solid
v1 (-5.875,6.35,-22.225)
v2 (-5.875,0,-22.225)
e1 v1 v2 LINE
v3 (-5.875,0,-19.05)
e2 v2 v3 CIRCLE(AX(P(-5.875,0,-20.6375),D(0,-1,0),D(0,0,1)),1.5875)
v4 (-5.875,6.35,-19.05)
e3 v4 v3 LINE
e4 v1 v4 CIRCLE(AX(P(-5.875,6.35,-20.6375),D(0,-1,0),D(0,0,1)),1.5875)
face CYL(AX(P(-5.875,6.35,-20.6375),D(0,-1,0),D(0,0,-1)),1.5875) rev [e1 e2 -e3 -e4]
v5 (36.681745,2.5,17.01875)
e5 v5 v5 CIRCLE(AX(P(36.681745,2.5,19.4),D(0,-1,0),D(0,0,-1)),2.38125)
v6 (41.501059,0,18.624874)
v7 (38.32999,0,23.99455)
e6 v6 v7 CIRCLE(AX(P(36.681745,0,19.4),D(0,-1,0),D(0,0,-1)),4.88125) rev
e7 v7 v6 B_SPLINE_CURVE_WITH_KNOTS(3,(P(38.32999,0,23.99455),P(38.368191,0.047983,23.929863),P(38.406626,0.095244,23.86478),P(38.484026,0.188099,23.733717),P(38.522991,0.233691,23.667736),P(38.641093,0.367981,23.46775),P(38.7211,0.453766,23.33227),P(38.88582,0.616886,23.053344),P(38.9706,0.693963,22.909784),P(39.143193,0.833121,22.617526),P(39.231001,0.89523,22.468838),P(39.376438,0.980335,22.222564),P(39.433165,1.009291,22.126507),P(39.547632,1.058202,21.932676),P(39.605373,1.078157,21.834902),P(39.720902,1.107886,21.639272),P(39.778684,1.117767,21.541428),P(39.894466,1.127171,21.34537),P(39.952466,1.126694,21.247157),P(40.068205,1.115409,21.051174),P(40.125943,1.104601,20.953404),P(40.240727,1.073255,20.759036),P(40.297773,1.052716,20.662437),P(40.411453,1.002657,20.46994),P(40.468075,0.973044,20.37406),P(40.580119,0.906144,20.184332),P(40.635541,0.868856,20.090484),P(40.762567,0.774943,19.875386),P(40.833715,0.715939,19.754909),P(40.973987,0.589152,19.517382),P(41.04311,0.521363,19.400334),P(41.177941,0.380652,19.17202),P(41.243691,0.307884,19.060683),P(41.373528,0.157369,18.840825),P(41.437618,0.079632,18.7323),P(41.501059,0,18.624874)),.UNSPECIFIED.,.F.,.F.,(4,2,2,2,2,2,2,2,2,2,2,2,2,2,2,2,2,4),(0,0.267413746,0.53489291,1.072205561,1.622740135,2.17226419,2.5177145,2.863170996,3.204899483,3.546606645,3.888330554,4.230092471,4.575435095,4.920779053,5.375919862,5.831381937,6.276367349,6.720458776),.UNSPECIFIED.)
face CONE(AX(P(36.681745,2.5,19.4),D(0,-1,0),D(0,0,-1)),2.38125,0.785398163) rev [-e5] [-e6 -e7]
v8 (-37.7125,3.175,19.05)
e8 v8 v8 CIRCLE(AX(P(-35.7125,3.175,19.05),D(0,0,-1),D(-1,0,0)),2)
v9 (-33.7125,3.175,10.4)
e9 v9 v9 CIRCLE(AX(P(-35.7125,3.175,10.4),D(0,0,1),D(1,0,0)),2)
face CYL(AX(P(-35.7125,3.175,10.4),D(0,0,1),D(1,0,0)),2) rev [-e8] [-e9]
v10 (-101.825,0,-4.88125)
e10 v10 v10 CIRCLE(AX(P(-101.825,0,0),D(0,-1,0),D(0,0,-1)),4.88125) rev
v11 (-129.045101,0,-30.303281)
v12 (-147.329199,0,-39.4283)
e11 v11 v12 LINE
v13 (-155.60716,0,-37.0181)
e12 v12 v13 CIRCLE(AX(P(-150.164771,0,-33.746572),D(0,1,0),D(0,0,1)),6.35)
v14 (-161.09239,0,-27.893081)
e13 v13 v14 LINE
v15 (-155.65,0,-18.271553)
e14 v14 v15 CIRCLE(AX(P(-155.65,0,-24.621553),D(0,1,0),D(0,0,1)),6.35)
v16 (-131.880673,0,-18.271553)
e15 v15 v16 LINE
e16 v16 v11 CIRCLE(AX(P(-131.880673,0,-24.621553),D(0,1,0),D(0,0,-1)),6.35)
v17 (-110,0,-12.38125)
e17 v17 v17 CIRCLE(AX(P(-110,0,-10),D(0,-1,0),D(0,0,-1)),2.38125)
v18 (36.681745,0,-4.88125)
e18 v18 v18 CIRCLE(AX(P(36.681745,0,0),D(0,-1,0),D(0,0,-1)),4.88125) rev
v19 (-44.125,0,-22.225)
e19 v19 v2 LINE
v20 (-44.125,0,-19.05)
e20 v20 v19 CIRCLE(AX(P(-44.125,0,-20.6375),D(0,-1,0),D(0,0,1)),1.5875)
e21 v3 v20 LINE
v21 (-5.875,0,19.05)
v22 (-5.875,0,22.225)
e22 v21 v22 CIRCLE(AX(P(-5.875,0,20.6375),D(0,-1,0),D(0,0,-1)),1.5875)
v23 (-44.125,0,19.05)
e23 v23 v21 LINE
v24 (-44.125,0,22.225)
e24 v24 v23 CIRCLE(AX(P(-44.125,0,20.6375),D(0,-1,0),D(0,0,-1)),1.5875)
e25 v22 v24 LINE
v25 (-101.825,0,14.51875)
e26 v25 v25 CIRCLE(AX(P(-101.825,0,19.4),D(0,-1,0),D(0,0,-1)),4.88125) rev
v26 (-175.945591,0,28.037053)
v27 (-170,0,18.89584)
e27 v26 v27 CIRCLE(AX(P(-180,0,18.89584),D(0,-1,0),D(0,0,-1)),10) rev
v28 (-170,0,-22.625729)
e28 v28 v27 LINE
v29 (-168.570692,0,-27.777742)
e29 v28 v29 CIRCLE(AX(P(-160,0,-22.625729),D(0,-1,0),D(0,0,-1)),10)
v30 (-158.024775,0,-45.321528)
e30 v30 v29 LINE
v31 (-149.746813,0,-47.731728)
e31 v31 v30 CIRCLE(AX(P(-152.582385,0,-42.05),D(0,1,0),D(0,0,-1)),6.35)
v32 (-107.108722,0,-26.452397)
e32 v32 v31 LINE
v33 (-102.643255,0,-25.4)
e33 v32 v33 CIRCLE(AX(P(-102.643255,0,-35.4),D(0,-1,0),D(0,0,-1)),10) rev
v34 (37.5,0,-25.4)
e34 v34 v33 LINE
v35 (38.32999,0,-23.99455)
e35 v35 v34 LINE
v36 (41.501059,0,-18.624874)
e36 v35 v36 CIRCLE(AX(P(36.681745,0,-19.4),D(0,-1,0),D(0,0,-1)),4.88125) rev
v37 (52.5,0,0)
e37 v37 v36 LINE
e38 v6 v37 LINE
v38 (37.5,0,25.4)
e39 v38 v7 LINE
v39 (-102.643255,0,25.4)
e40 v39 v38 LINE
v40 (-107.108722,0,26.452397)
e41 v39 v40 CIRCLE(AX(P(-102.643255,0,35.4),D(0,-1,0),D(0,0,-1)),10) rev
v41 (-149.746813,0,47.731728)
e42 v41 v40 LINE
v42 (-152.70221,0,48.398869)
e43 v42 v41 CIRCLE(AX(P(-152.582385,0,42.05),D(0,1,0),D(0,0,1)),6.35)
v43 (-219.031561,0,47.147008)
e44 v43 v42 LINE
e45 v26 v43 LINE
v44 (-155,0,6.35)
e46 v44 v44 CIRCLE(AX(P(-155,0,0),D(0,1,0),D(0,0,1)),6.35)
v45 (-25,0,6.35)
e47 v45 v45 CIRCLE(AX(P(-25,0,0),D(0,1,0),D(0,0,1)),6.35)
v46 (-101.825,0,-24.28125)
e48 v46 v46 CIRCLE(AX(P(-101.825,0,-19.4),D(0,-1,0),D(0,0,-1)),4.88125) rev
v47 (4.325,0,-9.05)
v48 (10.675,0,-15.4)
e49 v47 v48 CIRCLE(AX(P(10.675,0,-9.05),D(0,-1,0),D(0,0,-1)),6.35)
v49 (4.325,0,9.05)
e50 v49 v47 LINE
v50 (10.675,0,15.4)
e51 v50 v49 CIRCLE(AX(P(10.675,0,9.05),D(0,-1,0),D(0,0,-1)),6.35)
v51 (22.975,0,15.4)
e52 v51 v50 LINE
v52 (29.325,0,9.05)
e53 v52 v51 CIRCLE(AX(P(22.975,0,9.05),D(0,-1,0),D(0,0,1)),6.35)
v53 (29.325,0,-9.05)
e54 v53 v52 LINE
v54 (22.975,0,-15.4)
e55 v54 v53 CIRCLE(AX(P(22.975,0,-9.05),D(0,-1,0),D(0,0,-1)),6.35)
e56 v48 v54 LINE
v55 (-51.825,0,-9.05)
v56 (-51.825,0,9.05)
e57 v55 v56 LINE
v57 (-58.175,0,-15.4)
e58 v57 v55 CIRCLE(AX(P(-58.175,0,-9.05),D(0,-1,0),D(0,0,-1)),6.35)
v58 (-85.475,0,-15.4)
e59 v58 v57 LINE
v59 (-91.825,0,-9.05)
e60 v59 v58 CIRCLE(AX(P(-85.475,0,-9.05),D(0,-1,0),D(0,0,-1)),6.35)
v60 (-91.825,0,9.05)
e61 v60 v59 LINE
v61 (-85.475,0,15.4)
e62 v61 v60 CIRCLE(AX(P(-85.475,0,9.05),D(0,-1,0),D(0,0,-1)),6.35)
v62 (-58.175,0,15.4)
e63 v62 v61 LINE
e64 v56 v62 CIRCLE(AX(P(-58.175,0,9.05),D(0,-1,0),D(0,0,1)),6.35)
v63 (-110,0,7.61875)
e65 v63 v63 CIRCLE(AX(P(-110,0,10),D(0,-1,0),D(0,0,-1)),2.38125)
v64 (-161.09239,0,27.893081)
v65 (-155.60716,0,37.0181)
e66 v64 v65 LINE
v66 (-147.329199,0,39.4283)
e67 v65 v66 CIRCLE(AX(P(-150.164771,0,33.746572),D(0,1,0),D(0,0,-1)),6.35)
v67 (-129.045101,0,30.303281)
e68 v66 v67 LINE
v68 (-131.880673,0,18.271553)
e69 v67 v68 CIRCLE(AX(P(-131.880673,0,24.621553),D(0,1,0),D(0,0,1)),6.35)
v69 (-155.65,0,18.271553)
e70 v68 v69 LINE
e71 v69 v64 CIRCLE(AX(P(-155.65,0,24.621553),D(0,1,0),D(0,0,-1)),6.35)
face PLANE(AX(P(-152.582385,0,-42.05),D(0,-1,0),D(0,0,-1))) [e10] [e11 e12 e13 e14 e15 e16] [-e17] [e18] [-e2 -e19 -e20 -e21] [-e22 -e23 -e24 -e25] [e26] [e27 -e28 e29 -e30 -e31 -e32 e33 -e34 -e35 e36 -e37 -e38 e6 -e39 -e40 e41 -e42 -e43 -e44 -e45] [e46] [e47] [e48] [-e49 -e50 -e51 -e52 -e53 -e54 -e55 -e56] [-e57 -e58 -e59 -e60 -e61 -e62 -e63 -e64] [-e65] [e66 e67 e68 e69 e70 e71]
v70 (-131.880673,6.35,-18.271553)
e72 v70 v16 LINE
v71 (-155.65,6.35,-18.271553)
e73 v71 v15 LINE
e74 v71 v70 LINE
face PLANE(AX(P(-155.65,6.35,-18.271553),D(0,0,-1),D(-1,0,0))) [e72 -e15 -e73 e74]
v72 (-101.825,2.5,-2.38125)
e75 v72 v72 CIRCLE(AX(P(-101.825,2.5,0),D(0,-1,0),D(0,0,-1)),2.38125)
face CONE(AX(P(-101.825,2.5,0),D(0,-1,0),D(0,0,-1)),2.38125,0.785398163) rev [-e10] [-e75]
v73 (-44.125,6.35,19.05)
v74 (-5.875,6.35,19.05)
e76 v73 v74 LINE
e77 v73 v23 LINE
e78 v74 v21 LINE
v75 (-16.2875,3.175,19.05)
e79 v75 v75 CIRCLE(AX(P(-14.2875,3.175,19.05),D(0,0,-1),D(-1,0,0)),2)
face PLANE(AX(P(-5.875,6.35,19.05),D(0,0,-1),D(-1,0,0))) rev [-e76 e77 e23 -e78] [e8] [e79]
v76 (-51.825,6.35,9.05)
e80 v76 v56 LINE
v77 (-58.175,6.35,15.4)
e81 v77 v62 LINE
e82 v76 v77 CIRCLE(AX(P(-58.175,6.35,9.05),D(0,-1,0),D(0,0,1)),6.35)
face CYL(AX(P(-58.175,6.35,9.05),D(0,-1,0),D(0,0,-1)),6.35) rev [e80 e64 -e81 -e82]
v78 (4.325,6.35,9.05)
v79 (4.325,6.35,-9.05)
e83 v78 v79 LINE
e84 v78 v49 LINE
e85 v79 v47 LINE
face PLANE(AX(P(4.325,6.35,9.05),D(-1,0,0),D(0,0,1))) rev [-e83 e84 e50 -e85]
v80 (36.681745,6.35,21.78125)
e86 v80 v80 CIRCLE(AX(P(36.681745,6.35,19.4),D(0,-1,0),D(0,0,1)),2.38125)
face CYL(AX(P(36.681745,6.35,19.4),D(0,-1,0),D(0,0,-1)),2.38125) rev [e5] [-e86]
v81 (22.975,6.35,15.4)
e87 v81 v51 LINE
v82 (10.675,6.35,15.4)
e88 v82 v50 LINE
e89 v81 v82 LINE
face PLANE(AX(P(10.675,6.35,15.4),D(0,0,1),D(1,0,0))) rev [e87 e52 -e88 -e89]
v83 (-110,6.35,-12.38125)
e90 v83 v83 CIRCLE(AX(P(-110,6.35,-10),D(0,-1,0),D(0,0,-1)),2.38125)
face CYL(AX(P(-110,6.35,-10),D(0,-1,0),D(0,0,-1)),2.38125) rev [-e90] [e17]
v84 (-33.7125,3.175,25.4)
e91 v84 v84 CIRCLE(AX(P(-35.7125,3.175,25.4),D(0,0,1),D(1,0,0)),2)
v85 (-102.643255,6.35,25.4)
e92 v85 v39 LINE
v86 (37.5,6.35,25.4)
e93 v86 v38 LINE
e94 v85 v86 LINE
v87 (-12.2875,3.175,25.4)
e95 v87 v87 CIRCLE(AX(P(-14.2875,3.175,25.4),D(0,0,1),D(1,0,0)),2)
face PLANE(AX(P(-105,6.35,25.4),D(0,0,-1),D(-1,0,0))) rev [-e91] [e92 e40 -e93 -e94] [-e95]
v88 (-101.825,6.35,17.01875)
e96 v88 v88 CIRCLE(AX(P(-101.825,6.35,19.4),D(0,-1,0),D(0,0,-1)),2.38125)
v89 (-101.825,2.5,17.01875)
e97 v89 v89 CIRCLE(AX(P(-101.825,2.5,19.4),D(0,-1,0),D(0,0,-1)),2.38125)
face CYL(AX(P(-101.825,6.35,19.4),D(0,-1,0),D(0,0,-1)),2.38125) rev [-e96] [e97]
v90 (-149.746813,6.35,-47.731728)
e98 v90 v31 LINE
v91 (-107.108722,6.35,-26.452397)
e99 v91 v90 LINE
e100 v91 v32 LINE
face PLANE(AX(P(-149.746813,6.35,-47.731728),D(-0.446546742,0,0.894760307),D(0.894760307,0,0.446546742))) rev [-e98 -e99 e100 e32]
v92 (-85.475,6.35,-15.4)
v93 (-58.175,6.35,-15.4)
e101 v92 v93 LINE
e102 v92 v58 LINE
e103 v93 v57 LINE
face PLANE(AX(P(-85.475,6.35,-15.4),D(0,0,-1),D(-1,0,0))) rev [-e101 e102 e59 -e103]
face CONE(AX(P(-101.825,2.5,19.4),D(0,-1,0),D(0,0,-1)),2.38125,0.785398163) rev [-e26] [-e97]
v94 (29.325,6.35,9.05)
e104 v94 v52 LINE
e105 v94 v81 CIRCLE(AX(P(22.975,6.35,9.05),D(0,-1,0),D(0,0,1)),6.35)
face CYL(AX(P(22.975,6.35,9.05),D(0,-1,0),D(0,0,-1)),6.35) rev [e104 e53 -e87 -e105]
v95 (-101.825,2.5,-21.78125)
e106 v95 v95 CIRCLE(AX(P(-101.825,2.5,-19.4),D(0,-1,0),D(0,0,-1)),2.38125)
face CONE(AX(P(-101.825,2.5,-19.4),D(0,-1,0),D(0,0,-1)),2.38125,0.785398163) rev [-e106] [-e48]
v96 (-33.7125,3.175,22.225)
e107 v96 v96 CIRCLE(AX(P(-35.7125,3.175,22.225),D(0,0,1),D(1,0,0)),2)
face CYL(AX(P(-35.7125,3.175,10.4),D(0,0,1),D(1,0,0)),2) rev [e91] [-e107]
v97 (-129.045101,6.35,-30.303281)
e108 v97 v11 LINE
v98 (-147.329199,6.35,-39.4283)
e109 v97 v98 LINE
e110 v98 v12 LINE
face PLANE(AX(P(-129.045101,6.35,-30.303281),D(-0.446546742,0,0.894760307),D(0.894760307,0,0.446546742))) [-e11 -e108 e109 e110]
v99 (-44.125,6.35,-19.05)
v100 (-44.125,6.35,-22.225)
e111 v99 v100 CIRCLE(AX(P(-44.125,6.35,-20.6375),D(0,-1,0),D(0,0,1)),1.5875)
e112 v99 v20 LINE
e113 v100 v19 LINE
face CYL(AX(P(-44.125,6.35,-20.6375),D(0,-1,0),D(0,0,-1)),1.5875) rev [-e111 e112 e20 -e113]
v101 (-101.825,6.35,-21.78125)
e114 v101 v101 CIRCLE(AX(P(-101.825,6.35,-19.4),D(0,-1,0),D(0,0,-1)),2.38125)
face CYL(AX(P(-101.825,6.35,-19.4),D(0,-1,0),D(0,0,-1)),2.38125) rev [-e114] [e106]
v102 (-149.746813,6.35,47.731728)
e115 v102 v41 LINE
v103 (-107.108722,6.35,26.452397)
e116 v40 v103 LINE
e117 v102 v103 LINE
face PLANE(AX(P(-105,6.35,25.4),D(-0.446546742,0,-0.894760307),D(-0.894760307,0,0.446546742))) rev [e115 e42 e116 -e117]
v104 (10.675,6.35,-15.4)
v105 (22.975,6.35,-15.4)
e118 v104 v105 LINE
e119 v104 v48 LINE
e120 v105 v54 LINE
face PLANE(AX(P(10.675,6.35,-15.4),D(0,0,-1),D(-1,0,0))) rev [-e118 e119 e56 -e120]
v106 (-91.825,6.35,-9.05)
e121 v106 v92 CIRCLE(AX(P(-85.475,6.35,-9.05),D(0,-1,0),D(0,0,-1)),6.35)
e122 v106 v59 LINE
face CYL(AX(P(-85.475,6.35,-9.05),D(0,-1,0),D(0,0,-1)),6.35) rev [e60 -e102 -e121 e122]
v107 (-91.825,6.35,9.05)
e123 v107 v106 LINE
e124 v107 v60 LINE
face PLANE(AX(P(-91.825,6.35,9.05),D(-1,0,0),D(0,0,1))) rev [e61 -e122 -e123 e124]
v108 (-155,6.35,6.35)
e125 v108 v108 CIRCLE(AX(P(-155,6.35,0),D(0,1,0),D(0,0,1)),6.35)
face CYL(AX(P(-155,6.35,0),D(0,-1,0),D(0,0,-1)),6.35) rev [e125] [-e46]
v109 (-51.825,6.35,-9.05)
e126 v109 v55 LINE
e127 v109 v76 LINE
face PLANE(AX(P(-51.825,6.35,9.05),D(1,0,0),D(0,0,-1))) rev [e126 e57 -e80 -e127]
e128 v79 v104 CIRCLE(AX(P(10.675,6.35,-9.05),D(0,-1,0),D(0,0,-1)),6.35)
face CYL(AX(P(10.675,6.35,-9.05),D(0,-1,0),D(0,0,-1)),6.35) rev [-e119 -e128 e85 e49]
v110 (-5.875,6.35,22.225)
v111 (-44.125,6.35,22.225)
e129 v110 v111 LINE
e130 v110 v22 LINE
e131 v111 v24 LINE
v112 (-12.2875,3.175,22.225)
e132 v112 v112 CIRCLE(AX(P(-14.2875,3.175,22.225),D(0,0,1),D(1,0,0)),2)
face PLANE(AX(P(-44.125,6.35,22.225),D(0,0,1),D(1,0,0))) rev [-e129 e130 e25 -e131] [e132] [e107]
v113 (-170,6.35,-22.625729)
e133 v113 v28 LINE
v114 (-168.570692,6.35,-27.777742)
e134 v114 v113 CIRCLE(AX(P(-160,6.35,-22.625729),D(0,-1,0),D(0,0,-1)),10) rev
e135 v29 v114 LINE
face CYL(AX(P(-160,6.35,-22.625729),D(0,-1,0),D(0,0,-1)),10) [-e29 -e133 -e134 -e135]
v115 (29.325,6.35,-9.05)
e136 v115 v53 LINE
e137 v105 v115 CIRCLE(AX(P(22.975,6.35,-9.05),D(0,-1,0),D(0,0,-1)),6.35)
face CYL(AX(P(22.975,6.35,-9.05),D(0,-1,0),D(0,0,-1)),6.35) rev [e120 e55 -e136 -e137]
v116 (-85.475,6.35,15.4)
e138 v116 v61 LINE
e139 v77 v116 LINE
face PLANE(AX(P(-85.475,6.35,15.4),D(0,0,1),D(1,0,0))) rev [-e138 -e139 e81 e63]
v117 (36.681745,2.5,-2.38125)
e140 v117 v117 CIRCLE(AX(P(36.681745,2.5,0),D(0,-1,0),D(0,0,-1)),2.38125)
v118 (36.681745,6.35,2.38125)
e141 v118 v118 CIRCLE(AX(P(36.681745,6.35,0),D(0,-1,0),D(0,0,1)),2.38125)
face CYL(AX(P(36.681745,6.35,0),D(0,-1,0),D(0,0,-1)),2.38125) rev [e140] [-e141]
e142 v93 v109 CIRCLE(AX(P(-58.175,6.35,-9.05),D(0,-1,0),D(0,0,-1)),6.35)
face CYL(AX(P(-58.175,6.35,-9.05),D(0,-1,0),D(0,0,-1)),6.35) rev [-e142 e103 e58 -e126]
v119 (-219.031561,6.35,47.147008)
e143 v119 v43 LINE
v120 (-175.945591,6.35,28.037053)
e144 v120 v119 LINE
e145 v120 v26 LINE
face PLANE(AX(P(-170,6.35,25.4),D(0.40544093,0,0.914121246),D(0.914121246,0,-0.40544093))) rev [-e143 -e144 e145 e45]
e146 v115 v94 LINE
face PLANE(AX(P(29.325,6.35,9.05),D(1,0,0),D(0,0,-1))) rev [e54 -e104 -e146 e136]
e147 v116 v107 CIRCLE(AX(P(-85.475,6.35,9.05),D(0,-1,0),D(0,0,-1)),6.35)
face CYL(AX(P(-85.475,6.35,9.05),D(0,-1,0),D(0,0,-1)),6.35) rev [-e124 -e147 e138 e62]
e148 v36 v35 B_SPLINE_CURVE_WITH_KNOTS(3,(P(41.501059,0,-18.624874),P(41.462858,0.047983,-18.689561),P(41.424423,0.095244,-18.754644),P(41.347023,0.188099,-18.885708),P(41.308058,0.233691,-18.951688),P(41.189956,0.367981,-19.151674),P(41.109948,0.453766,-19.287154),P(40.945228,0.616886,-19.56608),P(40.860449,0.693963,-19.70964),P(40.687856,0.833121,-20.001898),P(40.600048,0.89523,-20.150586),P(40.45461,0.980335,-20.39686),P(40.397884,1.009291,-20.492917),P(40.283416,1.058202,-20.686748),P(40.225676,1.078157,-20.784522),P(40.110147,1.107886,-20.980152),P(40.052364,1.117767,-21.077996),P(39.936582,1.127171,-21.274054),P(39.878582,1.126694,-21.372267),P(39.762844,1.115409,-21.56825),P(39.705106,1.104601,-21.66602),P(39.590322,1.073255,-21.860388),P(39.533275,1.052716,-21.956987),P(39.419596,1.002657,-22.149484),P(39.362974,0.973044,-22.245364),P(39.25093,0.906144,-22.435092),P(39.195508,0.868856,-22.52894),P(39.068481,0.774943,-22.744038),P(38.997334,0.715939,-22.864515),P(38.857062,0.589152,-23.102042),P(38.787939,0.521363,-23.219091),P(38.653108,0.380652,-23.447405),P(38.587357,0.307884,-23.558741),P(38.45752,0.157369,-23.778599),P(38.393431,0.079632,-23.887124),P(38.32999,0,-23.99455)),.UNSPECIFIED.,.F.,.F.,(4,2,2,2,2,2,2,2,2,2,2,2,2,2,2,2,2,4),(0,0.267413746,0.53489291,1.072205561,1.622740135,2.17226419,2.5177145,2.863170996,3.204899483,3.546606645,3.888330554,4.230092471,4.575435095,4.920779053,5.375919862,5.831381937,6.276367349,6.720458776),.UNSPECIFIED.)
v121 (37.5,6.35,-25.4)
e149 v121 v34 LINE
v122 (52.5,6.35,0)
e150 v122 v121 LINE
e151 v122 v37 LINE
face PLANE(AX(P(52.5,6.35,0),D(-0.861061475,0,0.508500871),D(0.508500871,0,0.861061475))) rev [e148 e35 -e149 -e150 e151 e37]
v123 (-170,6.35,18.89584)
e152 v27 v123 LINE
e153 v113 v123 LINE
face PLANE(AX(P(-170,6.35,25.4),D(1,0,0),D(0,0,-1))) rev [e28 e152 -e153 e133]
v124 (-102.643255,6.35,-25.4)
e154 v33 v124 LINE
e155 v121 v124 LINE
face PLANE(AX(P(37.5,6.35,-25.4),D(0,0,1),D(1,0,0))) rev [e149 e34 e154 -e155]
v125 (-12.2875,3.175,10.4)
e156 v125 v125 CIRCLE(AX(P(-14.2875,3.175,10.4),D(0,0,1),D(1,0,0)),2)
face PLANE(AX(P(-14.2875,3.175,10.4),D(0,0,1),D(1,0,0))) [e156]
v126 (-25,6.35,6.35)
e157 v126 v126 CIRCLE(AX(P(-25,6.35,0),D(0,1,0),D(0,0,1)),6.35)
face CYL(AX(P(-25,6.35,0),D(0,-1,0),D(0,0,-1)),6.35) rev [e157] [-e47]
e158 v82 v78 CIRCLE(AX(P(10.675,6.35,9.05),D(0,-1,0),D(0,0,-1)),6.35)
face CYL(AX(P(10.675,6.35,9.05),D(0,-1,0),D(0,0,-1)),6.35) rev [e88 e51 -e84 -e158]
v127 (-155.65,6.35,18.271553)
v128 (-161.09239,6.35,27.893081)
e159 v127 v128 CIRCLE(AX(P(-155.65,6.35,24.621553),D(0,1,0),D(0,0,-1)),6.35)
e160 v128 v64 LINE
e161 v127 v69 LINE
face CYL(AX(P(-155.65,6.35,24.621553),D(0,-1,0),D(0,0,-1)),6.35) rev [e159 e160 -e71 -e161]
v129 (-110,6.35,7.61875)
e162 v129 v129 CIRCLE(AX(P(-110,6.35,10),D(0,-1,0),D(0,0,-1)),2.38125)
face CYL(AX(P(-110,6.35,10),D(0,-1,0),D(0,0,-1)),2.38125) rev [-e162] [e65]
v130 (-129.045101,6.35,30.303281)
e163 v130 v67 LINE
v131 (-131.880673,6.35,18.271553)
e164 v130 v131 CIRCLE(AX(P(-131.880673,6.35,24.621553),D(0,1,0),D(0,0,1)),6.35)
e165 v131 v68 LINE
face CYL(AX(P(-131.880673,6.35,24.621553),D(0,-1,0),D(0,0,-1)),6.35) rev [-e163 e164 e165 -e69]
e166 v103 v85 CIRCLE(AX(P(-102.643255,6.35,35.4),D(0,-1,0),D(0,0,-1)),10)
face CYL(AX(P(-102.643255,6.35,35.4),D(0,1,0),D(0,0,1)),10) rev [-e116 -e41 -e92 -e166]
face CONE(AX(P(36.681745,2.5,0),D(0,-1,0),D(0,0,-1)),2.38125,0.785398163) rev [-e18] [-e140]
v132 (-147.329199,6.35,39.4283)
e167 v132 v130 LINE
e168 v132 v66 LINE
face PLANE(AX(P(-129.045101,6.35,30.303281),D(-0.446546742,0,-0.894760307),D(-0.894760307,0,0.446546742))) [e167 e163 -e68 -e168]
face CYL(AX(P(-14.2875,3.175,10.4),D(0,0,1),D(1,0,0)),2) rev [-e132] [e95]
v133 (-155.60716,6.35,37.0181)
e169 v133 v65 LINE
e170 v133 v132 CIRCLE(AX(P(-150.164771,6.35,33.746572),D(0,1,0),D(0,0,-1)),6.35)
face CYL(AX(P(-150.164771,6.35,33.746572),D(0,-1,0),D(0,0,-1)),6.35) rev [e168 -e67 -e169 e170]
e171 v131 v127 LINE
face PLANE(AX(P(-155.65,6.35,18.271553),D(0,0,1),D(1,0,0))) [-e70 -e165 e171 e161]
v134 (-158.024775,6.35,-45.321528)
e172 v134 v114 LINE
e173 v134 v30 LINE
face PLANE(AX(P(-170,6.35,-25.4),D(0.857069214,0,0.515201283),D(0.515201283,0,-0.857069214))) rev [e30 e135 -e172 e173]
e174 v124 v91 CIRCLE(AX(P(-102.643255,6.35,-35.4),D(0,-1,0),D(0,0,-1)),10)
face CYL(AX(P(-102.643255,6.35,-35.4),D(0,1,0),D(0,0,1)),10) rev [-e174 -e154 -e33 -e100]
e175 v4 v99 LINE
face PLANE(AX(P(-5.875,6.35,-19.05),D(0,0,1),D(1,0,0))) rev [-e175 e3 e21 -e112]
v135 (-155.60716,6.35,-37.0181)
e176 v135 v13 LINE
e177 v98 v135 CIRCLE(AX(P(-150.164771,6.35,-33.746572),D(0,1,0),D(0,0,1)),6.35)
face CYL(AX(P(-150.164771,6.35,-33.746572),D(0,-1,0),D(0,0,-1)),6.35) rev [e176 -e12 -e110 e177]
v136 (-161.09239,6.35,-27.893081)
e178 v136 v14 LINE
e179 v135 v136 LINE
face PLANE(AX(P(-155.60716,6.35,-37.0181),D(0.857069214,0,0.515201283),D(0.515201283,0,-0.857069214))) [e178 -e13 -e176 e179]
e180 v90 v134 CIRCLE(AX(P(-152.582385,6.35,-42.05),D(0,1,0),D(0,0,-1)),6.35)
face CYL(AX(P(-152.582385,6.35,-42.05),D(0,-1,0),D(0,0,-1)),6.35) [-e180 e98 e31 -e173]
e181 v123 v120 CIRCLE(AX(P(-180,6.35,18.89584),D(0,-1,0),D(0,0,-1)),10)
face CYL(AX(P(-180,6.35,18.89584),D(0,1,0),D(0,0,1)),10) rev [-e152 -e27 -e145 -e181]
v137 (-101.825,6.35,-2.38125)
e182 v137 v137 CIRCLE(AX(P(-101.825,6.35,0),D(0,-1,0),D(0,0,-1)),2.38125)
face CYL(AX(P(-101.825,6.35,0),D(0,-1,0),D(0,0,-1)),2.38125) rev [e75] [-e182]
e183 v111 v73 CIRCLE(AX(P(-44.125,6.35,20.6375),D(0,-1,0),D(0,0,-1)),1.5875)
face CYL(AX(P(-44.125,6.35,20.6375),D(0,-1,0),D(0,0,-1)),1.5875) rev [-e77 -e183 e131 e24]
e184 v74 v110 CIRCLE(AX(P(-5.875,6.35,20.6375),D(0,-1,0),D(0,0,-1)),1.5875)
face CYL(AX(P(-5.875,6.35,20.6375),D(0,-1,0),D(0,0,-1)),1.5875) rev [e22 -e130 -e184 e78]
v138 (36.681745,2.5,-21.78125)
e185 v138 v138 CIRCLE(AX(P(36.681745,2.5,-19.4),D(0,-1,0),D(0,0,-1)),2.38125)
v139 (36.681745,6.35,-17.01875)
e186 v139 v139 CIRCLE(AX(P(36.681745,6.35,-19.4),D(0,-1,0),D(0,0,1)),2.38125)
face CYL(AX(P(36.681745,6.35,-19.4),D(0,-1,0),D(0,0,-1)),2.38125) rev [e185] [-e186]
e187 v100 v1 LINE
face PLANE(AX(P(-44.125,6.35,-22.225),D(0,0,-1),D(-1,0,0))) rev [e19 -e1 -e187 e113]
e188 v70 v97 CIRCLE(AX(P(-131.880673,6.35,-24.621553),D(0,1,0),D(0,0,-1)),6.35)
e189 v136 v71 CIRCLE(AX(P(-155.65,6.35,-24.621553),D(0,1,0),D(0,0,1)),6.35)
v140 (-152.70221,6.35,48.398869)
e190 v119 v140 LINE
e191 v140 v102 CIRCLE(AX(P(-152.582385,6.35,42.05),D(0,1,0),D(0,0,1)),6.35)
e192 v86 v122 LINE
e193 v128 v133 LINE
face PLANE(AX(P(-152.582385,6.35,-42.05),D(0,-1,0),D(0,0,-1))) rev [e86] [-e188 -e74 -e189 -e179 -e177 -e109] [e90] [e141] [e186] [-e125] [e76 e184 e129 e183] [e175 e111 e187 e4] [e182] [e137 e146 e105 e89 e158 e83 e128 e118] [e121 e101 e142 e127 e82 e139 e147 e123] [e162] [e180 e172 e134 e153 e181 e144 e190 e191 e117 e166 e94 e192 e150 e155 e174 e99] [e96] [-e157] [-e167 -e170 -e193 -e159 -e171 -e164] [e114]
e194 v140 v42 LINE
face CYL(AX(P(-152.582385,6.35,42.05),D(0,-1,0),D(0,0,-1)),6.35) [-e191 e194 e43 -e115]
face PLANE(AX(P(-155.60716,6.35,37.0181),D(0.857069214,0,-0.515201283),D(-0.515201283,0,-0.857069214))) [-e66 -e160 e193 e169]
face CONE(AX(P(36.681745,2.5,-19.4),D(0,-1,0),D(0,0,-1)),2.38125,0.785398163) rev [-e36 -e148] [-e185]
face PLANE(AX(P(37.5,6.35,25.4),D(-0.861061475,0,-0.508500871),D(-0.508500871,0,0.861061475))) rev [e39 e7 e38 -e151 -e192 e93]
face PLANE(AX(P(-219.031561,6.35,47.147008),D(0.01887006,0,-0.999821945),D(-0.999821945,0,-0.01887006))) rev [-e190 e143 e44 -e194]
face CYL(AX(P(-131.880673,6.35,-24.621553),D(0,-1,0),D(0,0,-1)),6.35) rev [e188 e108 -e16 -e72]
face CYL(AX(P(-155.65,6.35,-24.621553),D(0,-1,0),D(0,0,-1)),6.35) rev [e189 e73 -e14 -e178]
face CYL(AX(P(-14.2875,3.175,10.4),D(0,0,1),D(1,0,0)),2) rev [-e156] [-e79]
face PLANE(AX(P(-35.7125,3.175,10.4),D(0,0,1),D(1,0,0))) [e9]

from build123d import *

# Parameters (mm, degrees)
CROQUIS1_R              = 6.35
SALIENTE_EXTRUIR1_DEPTH = 6.35
REDONDEO1_R             = 10
CORTAR_EXTRUIR2_DEPTH   = 225.405229946
CORTAR_EXTRUIR3_DEPTH   = 225.405229946
CROQUIS7_R              = 2.38125
CORTAR_EXTRUIR4_DEPTH   = 225.405229946
CROQUIS8_R              = 2.38125
CORTAR_EXTRUIR5_DEPTH   = 225.405229946
CROQUIS9_R              = 2
CORTAR_EXTRUIR6_DEPTH   = 15
CHAFL_N1_SIZE           = 2.5


with BuildPart() as part:
    # Croquis1 → Saliente-Extruir1 (new body)
    with BuildSketch(Plane(origin=(0, 0, 0), x_dir=(1, 0, 0), z_dir=(0, 1, 0))):
        with BuildLine():
            Line((37.5, -25.4), (52.5, 0))
            Line((52.5, 0), (37.5, 25.4))
            Line((37.5, 25.4), (-105, 25.4))
            Line((-105, 25.4), (-149.746813481, 47.731727951))
            ThreePointArc((-149.746813481, 47.731727951), (-154.357530471, 48.146831931), (-158.024774803, 45.321528145))
            Line((-158.024774803, 45.321528145), (-170, 25.4))
            Line((-170, 25.4), (-170, -25.4))
            Line((-170, -25.4), (-219.03156103, -47.147007635))
            Line((-219.03156103, -47.147007635), (-152.702210171, -48.398869348))
            ThreePointArc((-152.702210171, -48.398869348), (-151.184140049, -48.244143221), (-149.746813481, -47.731727951))
            Line((-149.746813481, -47.731727951), (-105, -25.4))
            Line((-105, -25.4), (37.5, -25.4))
        make_face()
        with Locations(Location((-155, 0, 0), (0, 0, 270))):
            Circle(CROQUIS1_R, mode=Mode.SUBTRACT)
        with Locations(Location((-25, 0, 0), (0, 0, 270))):
            Circle(CROQUIS1_R, mode=Mode.SUBTRACT)
        with BuildLine():
            Line((-129.045100716, 30.303281185), (-147.329198773, 39.428299747))
            ThreePointArc((-147.329198773, 39.428299747), (-151.939915763, 39.843403727), (-155.607160095, 37.018099941))
            Line((-155.607160095, 37.018099941), (-161.092389512, 27.893081378))
            ThreePointArc((-161.092389512, 27.893081378), (-161.177056347, 21.495189828), (-155.65, 18.271553233))
            Line((-155.65, 18.271553233), (-131.880672526, 18.271553233))
            ThreePointArc((-131.880672526, 18.271553233), (-125.699998109, 23.164925706), (-129.045100716, 30.303281185))
        make_face(mode=Mode.SUBTRACT)
        with BuildLine():
            Line((-129.045100716, -30.303281185), (-147.329198773, -39.428299747))
            ThreePointArc((-147.329198773, -39.428299747), (-151.939915763, -39.843403727), (-155.607160095, -37.018099941))
            Line((-155.607160095, -37.018099941), (-161.092389512, -27.893081378))
            ThreePointArc((-161.092389512, -27.893081378), (-161.177056347, -21.495189828), (-155.65, -18.271553233))
            Line((-155.65, -18.271553233), (-131.880672526, -18.271553233))
            ThreePointArc((-131.880672526, -18.271553233), (-125.699998109, -23.164925706), (-129.045100716, -30.303281185))
        make_face(mode=Mode.SUBTRACT)
    extrude(amount=SALIENTE_EXTRUIR1_DEPTH)

    # Redondeo1
    redondeo1_edges = [part.edges().sort_by_distance(p)[0] for p in [
        (-105, 3.175, 25.4),
        (-170, 3.175, 25.4),
        (-170, 3.175, -25.4),
        (-105, 3.175, -25.4),
    ]]
    fillet(redondeo1_edges, radius=REDONDEO1_R)

    # Croquis5 → Cortar-Extruir2 (cut, through all)
    with BuildSketch(Plane.XZ):
        with BuildLine():
            Line((-44.125, 22.225), (-5.875, 22.225))
            ThreePointArc((-5.875, 22.225), (-4.2875, 20.6375), (-5.875, 19.05))
            Line((-5.875, 19.05), (-44.125, 19.05))
            ThreePointArc((-44.125, 19.05), (-45.7125, 20.6375), (-44.125, 22.225))
        make_face()
        with BuildLine():
            Line((-5.875, -19.05), (-44.125, -19.05))
            ThreePointArc((-44.125, -19.05), (-45.7125, -20.6375), (-44.125, -22.225))
            Line((-44.125, -22.225), (-5.875, -22.225))
            ThreePointArc((-5.875, -22.225), (-4.2875, -20.6375), (-5.875, -19.05))
        make_face()
    extrude(amount=-CORTAR_EXTRUIR2_DEPTH, mode=Mode.SUBTRACT)

    # Croquis6 → Cortar-Extruir3 (cut, through all)
    with BuildSketch(Plane.XZ):
        with BuildLine():
            Line((-85.475, 15.4), (-58.175, 15.4))
            ThreePointArc((-58.175, 15.4), (-53.684871939, 13.540128061), (-51.825, 9.05))
            Line((-51.825, 9.05), (-51.825, -9.05))
            ThreePointArc((-51.825, -9.05), (-53.684871939, -13.540128061), (-58.175, -15.4))
            Line((-58.175, -15.4), (-85.475, -15.4))
            ThreePointArc((-85.475, -15.4), (-89.965128061, -13.540128061), (-91.825, -9.05))
            Line((-91.825, -9.05), (-91.825, 9.05))
            ThreePointArc((-91.825, 9.05), (-89.965128061, 13.540128061), (-85.475, 15.4))
        make_face()
        with BuildLine():
            Line((10.675, 15.4), (22.975, 15.4))
            ThreePointArc((22.975, 15.4), (27.465128061, 13.540128061), (29.325, 9.05))
            Line((29.325, 9.05), (29.325, -9.05))
            ThreePointArc((29.325, -9.05), (27.465128061, -13.540128061), (22.975, -15.4))
            Line((22.975, -15.4), (10.675, -15.4))
            ThreePointArc((10.675, -15.4), (6.184871939, -13.540128061), (4.325, -9.05))
            Line((4.325, -9.05), (4.325, 9.05))
            ThreePointArc((4.325, 9.05), (6.184871939, 13.540128061), (10.675, 15.4))
        make_face()
    extrude(amount=-CORTAR_EXTRUIR3_DEPTH, mode=Mode.SUBTRACT)

    # Croquis7 → Cortar-Extruir4 (cut, through all)
    with BuildSketch(Plane.XZ):
        with Locations(Location((-101.825, 0, 0), (0, 0, 270))):
            Circle(CROQUIS7_R)
        with Locations(Location((-101.825, 19.4, 0), (0, 0, 270))):
            Circle(CROQUIS7_R)
        with Locations(Location((-101.825, -19.4, 0), (0, 0, 270))):
            Circle(CROQUIS7_R)
        with Locations(Location((36.681745283, -19.4, 0), (0, 0, 90))):
            Circle(CROQUIS7_R)
        with Locations(Location((36.681745283, 19.4, 0), (0, 0, 90))):
            Circle(CROQUIS7_R)
        with Locations(Location((36.681745283, 0, 0), (0, 0, 90))):
            Circle(CROQUIS7_R)
    extrude(amount=-CORTAR_EXTRUIR4_DEPTH, mode=Mode.SUBTRACT)

    # Croquis8 → Cortar-Extruir5 (cut, through all)
    with BuildSketch(Plane.XZ):
        with Locations(Location((-110, -10, 0), (0, 0, 270))):
            Circle(CROQUIS8_R)
        with Locations(Location((-110, 10, 0), (0, 0, 270))):
            Circle(CROQUIS8_R)
    extrude(amount=-CORTAR_EXTRUIR5_DEPTH, mode=Mode.SUBTRACT)

    # Croquis9 → Cortar-Extruir6 (cut)
    with BuildSketch(Plane.XY.offset(25.4)):
        with Locations((-14.2875, 3.175)):
            Circle(CROQUIS9_R)
        with Locations((-35.7125, 3.175)):
            Circle(CROQUIS9_R)
    extrude(amount=-CORTAR_EXTRUIR6_DEPTH, mode=Mode.SUBTRACT)

    # Chaflán1
    # the kernel refuses this chamfer: 2.5 mm, written as the material it takes off along each edge
    with BuildSketch(Plane(origin=(-101.825, 0, 19.4), x_dir=(0, 0, -1), z_dir=(-1, 0, 0))) as chafl_n1_piece_1:
        Polygon((2.38125 + CHAFL_N1_SIZE, 0), (2.38125, -CHAFL_N1_SIZE), (2.38125, 0), align=None)
    revolve(axis=Axis((-101.825, 0, 19.4), (0, -1, 0)), mode=Mode.SUBTRACT)
    with BuildSketch(Plane(origin=(-101.825, 0, -19.4), x_dir=(0, 0, -1), z_dir=(-1, 0, 0))) as chafl_n1_piece_2:
        Polygon((2.38125 + CHAFL_N1_SIZE, 0), (2.38125, -CHAFL_N1_SIZE), (2.38125, 0), align=None)
    revolve(axis=Axis((-101.825, 0, -19.4), (0, -1, 0)), mode=Mode.SUBTRACT)
    with BuildSketch(Plane(origin=(36.681745283, 0, -19.4), x_dir=(0, 0, 1), z_dir=(1, 0, 0))) as chafl_n1_piece_3:
        Polygon((2.38125 + CHAFL_N1_SIZE, 0), (2.38125, -CHAFL_N1_SIZE), (2.38125, 0), align=None)
    revolve(axis=Axis((36.681745283, 0, -19.4), (0, -1, 0)), mode=Mode.SUBTRACT)
    with BuildSketch(Plane(origin=(36.681745283, 0, 19.4), x_dir=(0, 0, 1), z_dir=(1, 0, 0))) as chafl_n1_piece_4:
        Polygon((2.38125 + CHAFL_N1_SIZE, 0), (2.38125, -CHAFL_N1_SIZE), (2.38125, 0), align=None)
    revolve(axis=Axis((36.681745283, 0, 19.4), (0, -1, 0)), mode=Mode.SUBTRACT)
    with BuildSketch(Plane(origin=(36.681745283, 0, 0), x_dir=(0, 0, 1), z_dir=(1, 0, 0))) as chafl_n1_piece_5:
        Polygon((2.38125 + CHAFL_N1_SIZE, 0), (2.38125, -CHAFL_N1_SIZE), (2.38125, 0), align=None)
    revolve(axis=Axis((36.681745283, 0, 0), (0, -1, 0)), mode=Mode.SUBTRACT)
    with BuildSketch(Plane(origin=(-101.825, 0, 0), x_dir=(0, 0, -1), z_dir=(-1, 0, 0))) as chafl_n1_piece_6:
        Polygon((2.38125 + CHAFL_N1_SIZE, 0), (2.38125, -CHAFL_N1_SIZE), (2.38125, 0), align=None)
    revolve(axis=Axis((-101.825, 0, 0), (0, -1, 0)), mode=Mode.SUBTRACT)


solid = part.part
